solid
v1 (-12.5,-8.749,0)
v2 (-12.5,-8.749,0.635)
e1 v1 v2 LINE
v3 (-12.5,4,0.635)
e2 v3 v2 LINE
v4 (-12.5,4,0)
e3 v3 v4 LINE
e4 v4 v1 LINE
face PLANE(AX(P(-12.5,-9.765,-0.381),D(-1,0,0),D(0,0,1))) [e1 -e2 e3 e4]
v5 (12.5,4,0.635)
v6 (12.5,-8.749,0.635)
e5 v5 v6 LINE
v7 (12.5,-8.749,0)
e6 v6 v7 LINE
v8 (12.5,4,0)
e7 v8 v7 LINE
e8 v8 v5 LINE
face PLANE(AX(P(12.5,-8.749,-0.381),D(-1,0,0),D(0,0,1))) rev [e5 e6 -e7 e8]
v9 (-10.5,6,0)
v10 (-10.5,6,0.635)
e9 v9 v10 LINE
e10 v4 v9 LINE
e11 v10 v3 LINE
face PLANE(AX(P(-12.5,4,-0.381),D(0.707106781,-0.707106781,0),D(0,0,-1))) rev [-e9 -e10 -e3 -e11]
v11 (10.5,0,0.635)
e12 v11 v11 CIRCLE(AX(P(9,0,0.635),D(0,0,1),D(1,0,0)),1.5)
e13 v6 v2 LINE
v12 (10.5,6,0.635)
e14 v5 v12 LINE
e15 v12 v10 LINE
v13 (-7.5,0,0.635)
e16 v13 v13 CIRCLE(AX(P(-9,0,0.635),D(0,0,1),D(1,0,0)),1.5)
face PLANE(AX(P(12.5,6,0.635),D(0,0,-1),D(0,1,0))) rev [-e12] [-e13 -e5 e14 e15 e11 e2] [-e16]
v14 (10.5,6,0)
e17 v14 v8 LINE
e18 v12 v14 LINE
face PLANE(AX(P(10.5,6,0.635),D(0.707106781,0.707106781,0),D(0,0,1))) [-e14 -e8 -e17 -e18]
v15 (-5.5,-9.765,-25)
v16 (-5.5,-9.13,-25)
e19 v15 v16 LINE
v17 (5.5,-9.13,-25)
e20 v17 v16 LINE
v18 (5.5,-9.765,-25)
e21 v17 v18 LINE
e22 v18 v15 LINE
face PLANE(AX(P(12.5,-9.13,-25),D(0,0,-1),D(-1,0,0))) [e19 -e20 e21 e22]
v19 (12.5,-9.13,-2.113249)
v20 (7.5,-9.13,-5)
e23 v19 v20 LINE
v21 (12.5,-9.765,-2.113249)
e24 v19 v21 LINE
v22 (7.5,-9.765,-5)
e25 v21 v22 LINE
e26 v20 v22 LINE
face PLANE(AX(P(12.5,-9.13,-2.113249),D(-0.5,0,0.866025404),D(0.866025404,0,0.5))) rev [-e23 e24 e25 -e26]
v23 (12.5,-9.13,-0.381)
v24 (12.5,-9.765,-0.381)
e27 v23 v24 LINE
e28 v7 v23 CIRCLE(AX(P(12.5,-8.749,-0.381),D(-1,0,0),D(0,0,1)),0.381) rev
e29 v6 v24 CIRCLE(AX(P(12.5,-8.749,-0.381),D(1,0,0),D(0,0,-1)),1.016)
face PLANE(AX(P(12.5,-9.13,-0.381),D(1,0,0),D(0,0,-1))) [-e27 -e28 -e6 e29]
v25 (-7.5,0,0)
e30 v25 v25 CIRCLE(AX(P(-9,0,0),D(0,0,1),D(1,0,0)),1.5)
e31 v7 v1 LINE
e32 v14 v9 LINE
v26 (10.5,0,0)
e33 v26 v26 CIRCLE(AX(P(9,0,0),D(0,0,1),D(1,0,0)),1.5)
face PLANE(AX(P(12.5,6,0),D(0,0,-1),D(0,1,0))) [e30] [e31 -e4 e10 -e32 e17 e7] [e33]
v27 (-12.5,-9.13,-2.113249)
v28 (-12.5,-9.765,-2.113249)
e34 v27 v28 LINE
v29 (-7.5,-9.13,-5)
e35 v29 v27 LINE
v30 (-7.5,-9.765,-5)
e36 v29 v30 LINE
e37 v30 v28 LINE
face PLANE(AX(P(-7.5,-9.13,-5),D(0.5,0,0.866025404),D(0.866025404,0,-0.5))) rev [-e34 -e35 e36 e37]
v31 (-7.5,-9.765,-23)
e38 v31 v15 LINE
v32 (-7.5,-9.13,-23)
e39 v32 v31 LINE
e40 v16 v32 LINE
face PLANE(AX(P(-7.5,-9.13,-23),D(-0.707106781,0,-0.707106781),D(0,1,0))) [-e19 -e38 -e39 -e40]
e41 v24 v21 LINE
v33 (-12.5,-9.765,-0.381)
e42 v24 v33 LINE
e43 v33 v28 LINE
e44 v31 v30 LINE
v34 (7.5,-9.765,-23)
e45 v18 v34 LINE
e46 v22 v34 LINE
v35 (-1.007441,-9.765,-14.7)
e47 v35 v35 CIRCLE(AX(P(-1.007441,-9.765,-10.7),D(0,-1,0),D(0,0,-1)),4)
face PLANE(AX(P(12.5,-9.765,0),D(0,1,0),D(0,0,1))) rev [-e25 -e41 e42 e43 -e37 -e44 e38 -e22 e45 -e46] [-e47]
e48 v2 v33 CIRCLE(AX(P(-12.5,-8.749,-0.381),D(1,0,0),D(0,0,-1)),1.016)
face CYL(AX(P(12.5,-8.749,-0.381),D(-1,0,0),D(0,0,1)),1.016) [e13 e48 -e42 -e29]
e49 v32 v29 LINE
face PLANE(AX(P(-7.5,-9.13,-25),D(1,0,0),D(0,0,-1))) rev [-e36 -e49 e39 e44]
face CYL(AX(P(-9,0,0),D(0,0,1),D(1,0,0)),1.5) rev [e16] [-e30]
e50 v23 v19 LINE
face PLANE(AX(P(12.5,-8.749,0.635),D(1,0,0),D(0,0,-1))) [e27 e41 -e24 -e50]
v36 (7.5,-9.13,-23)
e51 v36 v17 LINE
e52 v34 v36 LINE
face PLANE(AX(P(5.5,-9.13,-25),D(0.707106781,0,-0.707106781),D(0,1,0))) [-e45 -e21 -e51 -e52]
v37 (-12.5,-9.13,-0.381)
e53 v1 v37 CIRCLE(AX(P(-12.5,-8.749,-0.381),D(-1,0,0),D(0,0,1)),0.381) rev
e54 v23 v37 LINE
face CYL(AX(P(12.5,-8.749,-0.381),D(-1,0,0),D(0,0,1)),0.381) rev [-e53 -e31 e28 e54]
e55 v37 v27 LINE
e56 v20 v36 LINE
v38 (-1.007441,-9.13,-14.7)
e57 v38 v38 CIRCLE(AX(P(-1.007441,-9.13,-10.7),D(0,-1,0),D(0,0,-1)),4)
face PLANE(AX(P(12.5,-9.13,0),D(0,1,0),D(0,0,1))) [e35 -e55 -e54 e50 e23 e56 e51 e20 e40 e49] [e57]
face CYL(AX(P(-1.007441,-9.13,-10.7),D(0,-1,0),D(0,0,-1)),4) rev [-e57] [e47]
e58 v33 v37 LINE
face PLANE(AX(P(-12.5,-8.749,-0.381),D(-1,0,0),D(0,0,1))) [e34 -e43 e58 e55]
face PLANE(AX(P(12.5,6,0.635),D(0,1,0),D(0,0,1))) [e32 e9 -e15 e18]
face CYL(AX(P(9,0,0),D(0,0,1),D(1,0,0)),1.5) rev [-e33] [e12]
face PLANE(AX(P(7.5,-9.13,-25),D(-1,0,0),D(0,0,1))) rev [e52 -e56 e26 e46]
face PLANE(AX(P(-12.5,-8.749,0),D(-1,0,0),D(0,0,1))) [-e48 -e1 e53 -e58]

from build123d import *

# Parameters (mm, degrees)
BASE_FLANGE1_DEPTH        = 12.5
SKETCH7_R                 = 4
CUT_EXTRUDE1_DEPTH        = 10
SKETCH8_R                 = 1.5
CUT_EXTRUDE2_DEPTH        = 0.635
BREAK_CORNER1_START       = 11.66726189
BREAK_CORNER1_OUTLINE_W   = 6
BREAK_CORNER1_OUTLINE_H   = 3
BREAK_CORNER1_DEPTH       = 1.414213562
BREAK_CORNER1_START_2     = 21.566756826
BREAK_CORNER1_2_OUTLINE_W = 14
BREAK_CORNER1_2_OUTLINE_H = 3
BREAK_CORNER1_2_DEPTH     = 1.414213563
BREAK_CORNER1_START_3     = -22.980970389
BREAK_CORNER1_3_OUTLINE_W = 14
BREAK_CORNER1_3_OUTLINE_H = 3
BREAK_CORNER1_3_DEPTH     = 1.414213563
BREAK_CORNER1_START_4     = -13.081475452
BREAK_CORNER1_4_OUTLINE_W = 6
BREAK_CORNER1_4_OUTLINE_H = 3
BREAK_CORNER1_4_DEPTH     = 1.414213562


# Read off the part's stored shape, not the designer's step: Break-Corner1
# Sheet-metal steps are written as plain solids
with BuildPart() as part:
    # Sketch2 → Base-Flange1 (new, symmetric)
    with BuildSketch(Plane(origin=(0, 0, 0), x_dir=(0, 0, -1), z_dir=(1, 0, 0))):
        with BuildLine():
            Line((0, 6), (0, -8.749))
            ThreePointArc((0, -8.749), (0.111592316, -9.018407684), (0.381, -9.13))
            Line((0.381, -9.13), (25, -9.13))
            Line((25, -9.13), (25, -9.765))
            Line((25, -9.765), (0.381, -9.765))
            ThreePointArc((0.381, -9.765), (-0.33742049, -9.46742049), (-0.635, -8.749))
            Line((-0.635, -8.749), (-0.635, 6))
            Line((-0.635, 6), (0, 6))
        make_face()
    extrude(amount=BASE_FLANGE1_DEPTH, both=True)

    # Sketch7 → Cut-Extrude1 (cut)
    with BuildSketch(Plane.XZ.offset(9.765)):
        with Locations(Location((-1.007441433, -10.7, 0), (0, 0, 270))):
            Circle(SKETCH7_R)
        Polygon((7.5, -25), (7.5, -5), (12.5, -2.113248654), (12.5, -25), align=None)
        Polygon((-7.5, -25), (-7.5, -5), (-12.5, -2.113248654), (-12.5, -25), align=None)
    extrude(amount=-CUT_EXTRUDE1_DEPTH, mode=Mode.SUBTRACT)

    # Sketch8 → Cut-Extrude2 (cut)
    with BuildSketch(Plane.XY.offset(0.635)):
        with Locations((9, 0)):
            Circle(SKETCH8_R)
        with Locations((-9, 0)):
            Circle(SKETCH8_R)
    extrude(amount=-CUT_EXTRUDE2_DEPTH, mode=Mode.SUBTRACT)

    # Break-Corner1 outline → Break-Corner1 (cut)
    with BuildSketch(Plane(origin=(0, 0, 0), x_dir=(0.7071067811865474, -0.7071067811865477, 0), z_dir=(0.7071067811865476, 0.7071067811865476, 0)).offset(BREAK_CORNER1_START)):
        with Locations((5, -0.5)):
            Rectangle(BREAK_CORNER1_OUTLINE_W, BREAK_CORNER1_OUTLINE_H)
    extrude(amount=BREAK_CORNER1_DEPTH, mode=Mode.SUBTRACT)

    # Break-Corner1 2 outline → Break-Corner1 2 (cut)
    with BuildSketch(Plane(origin=(0, 0, 0), x_dir=(0.707106781186548, 0, 0.707106781186547), z_dir=(0.707106781186547, 0, -0.707106781186548)).offset(BREAK_CORNER1_START_2)):
        with Locations((-16, 9.5)):
            Rectangle(BREAK_CORNER1_2_OUTLINE_W, BREAK_CORNER1_2_OUTLINE_H)
    extrude(amount=BREAK_CORNER1_2_DEPTH, mode=Mode.SUBTRACT)

    # Break-Corner1 3 outline → Break-Corner1 3 (cut)
    with BuildSketch(Plane(origin=(0, 0, 0), x_dir=(0.7071067811865474, 0, -0.7071067811865477), z_dir=(0.7071067811865476, 0, 0.7071067811865476)).offset(BREAK_CORNER1_START_3)):
        with Locations((16, -9.5)):
            Rectangle(BREAK_CORNER1_3_OUTLINE_W, BREAK_CORNER1_3_OUTLINE_H)
    extrude(amount=BREAK_CORNER1_3_DEPTH, mode=Mode.SUBTRACT)

    # Break-Corner1 4 outline → Break-Corner1 4 (cut)
    with BuildSketch(Plane(origin=(0, 0, 0), x_dir=(0.707106781186548, 0.707106781186547, 0), z_dir=(0.707106781186547, -0.707106781186548, 0)).offset(BREAK_CORNER1_START_4)):
        with Locations((-5, 0.5)):
            Rectangle(BREAK_CORNER1_4_OUTLINE_W, BREAK_CORNER1_4_OUTLINE_H)
    extrude(amount=BREAK_CORNER1_4_DEPTH, mode=Mode.SUBTRACT)


solid = part.part
